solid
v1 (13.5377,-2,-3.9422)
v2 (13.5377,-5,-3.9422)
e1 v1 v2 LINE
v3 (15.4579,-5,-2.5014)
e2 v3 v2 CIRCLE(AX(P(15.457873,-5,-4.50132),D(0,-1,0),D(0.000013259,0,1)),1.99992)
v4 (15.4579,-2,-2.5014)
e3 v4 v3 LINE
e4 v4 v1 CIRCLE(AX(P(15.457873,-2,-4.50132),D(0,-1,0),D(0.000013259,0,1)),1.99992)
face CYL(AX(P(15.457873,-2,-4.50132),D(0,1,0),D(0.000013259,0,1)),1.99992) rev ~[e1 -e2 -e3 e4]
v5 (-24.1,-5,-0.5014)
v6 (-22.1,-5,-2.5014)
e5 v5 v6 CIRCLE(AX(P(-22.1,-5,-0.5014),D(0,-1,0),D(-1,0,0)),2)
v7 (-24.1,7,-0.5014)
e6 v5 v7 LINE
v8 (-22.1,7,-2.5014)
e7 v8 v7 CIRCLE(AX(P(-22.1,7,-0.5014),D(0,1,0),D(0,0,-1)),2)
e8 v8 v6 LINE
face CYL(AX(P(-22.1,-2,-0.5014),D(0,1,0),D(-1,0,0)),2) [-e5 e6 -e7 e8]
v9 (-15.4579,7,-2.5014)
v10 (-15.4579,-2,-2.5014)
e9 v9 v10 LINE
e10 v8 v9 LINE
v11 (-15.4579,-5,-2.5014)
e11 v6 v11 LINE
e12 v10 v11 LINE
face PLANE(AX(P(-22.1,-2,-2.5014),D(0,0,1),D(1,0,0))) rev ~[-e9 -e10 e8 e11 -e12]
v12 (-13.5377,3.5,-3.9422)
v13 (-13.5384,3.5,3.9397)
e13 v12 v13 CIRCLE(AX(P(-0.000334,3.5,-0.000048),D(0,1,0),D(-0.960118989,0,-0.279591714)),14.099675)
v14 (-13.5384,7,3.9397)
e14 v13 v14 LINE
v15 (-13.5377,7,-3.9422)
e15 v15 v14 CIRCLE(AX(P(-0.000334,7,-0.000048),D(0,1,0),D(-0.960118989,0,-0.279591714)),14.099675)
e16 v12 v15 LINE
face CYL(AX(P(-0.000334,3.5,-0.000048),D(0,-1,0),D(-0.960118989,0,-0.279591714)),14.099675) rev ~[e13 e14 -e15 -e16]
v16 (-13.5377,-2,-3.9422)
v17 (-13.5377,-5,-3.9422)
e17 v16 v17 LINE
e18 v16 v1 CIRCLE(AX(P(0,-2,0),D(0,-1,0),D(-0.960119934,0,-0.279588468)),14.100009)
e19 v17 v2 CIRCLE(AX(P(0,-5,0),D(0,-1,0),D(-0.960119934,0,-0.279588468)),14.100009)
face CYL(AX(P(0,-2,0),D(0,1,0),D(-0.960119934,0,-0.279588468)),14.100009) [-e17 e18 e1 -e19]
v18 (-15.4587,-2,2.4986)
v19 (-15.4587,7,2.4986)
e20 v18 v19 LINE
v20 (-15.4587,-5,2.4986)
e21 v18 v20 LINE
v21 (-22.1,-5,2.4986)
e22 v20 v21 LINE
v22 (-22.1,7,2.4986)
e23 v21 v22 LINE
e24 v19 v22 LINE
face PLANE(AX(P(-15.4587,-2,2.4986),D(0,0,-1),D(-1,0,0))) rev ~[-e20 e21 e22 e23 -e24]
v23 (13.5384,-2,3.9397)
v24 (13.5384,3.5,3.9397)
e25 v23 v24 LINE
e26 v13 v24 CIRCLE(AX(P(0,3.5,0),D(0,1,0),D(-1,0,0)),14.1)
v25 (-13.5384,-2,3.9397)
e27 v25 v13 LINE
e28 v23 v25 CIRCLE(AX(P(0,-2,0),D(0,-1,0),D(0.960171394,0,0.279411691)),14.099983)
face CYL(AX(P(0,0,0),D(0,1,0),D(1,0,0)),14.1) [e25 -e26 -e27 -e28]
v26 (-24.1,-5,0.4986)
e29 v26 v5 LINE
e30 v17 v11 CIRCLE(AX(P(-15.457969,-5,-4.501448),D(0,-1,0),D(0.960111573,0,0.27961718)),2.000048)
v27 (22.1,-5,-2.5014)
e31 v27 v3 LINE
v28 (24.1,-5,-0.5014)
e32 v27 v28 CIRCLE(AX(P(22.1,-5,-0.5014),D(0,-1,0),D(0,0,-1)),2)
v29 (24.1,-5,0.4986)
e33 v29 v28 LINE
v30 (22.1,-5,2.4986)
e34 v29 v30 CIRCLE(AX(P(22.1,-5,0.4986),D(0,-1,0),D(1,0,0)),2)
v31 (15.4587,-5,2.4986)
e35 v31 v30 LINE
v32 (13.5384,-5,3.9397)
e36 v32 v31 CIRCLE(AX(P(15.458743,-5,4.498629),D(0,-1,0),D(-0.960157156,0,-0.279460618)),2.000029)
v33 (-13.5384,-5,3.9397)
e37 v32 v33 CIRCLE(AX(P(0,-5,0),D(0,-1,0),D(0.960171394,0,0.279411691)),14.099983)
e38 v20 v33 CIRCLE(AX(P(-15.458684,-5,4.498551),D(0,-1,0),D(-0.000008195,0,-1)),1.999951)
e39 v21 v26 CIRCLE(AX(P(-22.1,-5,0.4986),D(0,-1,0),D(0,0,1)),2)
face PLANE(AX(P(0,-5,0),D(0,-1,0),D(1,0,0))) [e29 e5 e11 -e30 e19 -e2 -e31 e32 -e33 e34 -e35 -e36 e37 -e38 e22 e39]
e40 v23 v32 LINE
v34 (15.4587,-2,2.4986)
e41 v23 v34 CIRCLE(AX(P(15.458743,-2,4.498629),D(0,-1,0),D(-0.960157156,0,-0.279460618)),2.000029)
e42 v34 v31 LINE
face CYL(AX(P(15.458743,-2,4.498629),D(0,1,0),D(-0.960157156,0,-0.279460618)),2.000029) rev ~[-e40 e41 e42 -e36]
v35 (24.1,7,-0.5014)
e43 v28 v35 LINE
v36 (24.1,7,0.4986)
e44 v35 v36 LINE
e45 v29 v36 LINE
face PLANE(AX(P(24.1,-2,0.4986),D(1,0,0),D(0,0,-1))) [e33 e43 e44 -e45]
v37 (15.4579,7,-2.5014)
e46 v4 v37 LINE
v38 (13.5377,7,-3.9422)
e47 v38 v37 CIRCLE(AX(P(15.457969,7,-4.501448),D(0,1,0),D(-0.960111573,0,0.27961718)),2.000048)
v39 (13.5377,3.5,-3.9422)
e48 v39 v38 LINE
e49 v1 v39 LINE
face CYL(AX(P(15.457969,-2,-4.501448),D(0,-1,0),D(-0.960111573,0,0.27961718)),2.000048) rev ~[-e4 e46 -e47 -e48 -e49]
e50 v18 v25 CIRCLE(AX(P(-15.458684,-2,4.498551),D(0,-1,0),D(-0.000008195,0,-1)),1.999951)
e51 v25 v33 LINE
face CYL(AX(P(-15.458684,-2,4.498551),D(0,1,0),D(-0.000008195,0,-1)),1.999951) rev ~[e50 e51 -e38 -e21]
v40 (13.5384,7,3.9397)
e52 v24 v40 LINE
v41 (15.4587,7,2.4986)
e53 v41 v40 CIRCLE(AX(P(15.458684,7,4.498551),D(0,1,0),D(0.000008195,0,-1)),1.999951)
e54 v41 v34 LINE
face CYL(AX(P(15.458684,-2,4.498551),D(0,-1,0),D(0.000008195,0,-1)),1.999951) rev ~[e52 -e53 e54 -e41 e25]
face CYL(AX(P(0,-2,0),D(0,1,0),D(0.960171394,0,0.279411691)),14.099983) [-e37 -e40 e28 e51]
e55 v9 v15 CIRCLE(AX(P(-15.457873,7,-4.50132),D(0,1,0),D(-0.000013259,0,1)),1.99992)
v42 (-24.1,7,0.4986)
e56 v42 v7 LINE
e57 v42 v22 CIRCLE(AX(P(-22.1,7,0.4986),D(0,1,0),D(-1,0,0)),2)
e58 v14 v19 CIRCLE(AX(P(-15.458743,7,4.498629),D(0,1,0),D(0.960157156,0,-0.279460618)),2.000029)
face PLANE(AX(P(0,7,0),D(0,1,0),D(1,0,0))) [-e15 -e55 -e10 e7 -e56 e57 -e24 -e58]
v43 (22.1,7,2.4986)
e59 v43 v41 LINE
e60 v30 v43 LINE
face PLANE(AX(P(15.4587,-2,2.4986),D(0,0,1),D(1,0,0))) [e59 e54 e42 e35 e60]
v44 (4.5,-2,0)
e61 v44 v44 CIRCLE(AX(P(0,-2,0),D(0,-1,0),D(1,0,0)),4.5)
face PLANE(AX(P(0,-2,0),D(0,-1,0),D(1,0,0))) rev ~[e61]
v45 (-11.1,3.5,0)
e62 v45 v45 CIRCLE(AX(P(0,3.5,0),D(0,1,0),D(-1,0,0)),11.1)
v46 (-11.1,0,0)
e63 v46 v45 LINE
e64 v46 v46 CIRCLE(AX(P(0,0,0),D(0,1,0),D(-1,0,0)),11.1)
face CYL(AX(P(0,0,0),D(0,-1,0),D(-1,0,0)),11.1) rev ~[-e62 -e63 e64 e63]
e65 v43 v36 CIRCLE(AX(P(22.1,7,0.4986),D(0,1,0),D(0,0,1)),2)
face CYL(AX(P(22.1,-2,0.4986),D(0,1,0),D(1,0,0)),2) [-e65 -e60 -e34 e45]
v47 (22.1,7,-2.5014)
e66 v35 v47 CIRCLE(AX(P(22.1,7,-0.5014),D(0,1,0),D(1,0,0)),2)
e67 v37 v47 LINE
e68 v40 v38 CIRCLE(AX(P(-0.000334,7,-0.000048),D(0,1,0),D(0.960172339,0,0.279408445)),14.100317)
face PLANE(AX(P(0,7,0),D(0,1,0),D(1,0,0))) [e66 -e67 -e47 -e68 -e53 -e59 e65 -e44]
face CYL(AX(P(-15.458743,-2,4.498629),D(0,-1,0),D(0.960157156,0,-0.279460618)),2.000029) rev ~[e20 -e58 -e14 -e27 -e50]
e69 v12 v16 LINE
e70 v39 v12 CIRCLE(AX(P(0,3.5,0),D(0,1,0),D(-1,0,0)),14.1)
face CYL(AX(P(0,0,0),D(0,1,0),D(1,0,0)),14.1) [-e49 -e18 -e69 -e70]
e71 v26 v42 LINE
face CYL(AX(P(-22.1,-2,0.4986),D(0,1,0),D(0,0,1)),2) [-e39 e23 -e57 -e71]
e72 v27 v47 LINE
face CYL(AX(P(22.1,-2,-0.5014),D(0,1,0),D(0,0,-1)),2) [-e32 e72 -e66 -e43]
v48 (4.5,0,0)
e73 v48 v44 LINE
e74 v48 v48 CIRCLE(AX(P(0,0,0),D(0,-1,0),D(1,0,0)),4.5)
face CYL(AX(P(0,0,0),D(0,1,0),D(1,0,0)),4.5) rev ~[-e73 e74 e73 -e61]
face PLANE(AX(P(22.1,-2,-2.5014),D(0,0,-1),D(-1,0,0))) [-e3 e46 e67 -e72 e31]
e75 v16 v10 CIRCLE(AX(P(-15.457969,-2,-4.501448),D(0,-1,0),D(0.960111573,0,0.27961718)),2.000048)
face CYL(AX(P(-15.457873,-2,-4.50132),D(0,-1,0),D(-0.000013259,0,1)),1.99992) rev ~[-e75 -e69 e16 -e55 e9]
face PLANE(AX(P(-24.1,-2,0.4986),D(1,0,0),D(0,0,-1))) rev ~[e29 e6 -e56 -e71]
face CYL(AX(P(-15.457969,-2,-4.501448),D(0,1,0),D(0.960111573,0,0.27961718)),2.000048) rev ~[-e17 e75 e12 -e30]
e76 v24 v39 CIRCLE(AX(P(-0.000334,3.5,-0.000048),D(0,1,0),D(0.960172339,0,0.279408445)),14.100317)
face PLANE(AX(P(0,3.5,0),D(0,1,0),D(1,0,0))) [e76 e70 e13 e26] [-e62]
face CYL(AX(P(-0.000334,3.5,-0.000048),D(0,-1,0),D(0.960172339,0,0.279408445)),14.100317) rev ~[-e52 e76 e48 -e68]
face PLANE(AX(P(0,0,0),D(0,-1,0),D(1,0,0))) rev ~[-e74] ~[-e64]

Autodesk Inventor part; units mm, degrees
ref_plane "YZ Plane" through (0, 0, 0) normal (1, 0, 0) x (0, 1, 0)
ref_plane "XZ Plane" through (0, 0, 0) normal (0, 1, 0) x (-1, 0, 0)
ref_plane "XY Plane" through (0, 0, 0) normal (0, 0, 1) x (1, 0, 0)
sketch "Sketch2" plane through (0, 0, 0) normal (0, 1, 0) x (-1, 0, 0)
  circle A0 centre (0, 0) radius 11.1
  circle A1 centre (0, 0) radius 14.1
  dimension "d5" = 22.2
  dimension "d6" = 3
extrude "Extrusion2" add sketch "Sketch2" along normal blind 3.5
sketch "Sketch3" plane through (0, 0, 0) normal (0, -1, 0) x (1, 0, 0)
  circle A0 centre (0, 0) radius 14.1 projected
  circle A1 centre (0, 0) radius 4.5
  dimension "d9" = 9
extrude "Extrusion3" add sketch "Sketch3" along normal blind 2
sketch "Sketch4" plane through (0, -2, 0) normal (0, -1, 0) x (1, 0, 0)
  line L0 (-22.1, -2.5014) -> (-15.4579, -2.5014)
  line L1 (-15.4587, 2.4986) -> (-22.1, 2.4986)
  line L2 (-24.1, 0.4986) -> (-24.1, -0.5014)
  line L3 (-24.1, -2.5014) -> (-14.1, 2.4986) construction
  line L4 (-14.1, -2.5014) -> (-24.1, 2.4986) construction
  line L5 (-14.1, -2.5014) -> (-13.8763, -2.5014)
  line L6 (-14.1, 2.4986) -> (-13.8769, 2.4986)
  arc A0 (-13.5377, -3.9422) -> (-15.4579, -2.5014) centre (-15.4579, -4.5014) ccw
  arc A1 (-15.4587, 2.4986) -> (-13.5384, 3.9397) centre (-15.4587, 4.4986) ccw
  arc A2 (-24.1, -0.5014) -> (-22.1, -2.5014) centre (-22.1, -0.5014) ccw
  arc A3 (-22.1, 2.4986) -> (-24.1, 0.4986) centre (-22.1, 0.4986) ccw
  line L7 (0, -19.3985) -> (0, 27.2303) construction
  line L8 (22.1, -2.5014) -> (15.4579, -2.5014)
  line L9 (15.4587, 2.4986) -> (22.1, 2.4986)
  line L10 (24.1, 0.4986) -> (24.1, -0.5014)
  arc A4 (15.4579, -2.5014) -> (13.5377, -3.9422) centre (15.4579, -4.5014) ccw
  arc A5 (13.5384, 3.9397) -> (15.4587, 2.4986) centre (15.4587, 4.4986) ccw
  arc A6 (22.1, -2.5014) -> (24.1, -0.5014) centre (22.1, -0.5014) ccw
  arc A7 (24.1, 0.4986) -> (22.1, 2.4986) centre (22.1, 0.4986) ccw
  arc A8 (-13.5377, -3.9422) -> (13.5377, -3.9422) centre (0, 0) ccw
  arc A9 (13.5384, 3.9397) -> (-13.5384, 3.9397) centre (0, 0) ccw
  point P0 (-19.1, -0.0014)
  point P1 (14.1, 0)
  point P2 (-14.1, 0)
  point P3 (-14.1, 0)
  dimension "d13" = 5
  dimension "d14" = 2
extrude "Extrusion4" add sketch "Sketch4" along normal blind 3
sketch "Sketch5" plane through (0, -2, 0) normal (0, 1, 0) x (1, 0, 0)
  arc A0 (-13.5377, 3.9422) -> (-13.5384, -3.9397) centre (0, 0) ccw projected
  arc A1 (-15.4579, 2.5014) -> (-13.5377, 3.9422) centre (-15.4579, 4.5014) ccw projected
  line L0 (-22.1, 2.5014) -> (-15.4579, 2.5014) projected
  arc A2 (-22.1, 2.5014) -> (-24.1, 0.5014) centre (-22.1, 0.5014) ccw projected
  line L1 (-24.1, -0.4986) -> (-24.1, 0.5014) projected
  arc A3 (-24.1, -0.4986) -> (-22.1, -2.4986) centre (-22.1, -0.4986) ccw projected
  line L2 (-15.4587, -2.4986) -> (-22.1, -2.4986) projected
  arc A4 (-13.5384, -3.9397) -> (-15.4587, -2.4986) centre (-15.4587, -4.4986) ccw projected
  arc A5 (13.5384, -3.9397) -> (13.5377, 3.9422) centre (0, 0) ccw projected
  arc A6 (15.4587, -2.4986) -> (13.5384, -3.9397) centre (15.4587, -4.4986) ccw projected
  line L3 (22.1, -2.4986) -> (15.4587, -2.4986) projected
  arc A7 (22.1, -2.4986) -> (24.1, -0.4986) centre (22.1, -0.4986) ccw projected
  line L4 (24.1, 0.5014) -> (24.1, -0.4986) projected
  arc A8 (24.1, 0.5014) -> (22.1, 2.5014) centre (22.1, 0.5014) ccw projected
  line L5 (15.4579, 2.5014) -> (22.1, 2.5014) projected
  arc A9 (13.5377, 3.9422) -> (15.4579, 2.5014) centre (15.4579, 4.5014) ccw projected
extrude "Extrusion5" add sketch "Sketch5" along normal up to surface (5.5 mm away)
sketch "Sketch6" plane through (0, 3.5, 0) normal (0, 1, 0) x (1, 0, 0)
  arc A0 (-15.4579, 2.5014) -> (-13.5377, 3.9422) centre (-15.4579, 4.5014) ccw projected
  line L0 (-22.1, 2.5014) -> (-15.4579, 2.5014) projected
  arc A1 (-22.1, 2.5014) -> (-24.1, 0.5014) centre (-22.1, 0.5014) ccw projected
  line L1 (-24.1, -0.4986) -> (-24.1, 0.5014) projected
  arc A2 (-24.1, -0.4986) -> (-22.1, -2.4986) centre (-22.1, -0.4986) ccw projected
  line L2 (-15.4587, -2.4986) -> (-22.1, -2.4986) projected
  arc A3 (-13.5384, -3.9397) -> (-15.4587, -2.4986) centre (-15.4587, -4.4986) ccw projected
  arc A4 (-13.5377, 3.9422) -> (-13.5384, -3.9397) centre (0, 0) ccw projected
  arc A5 (15.4587, -2.4986) -> (13.5384, -3.9397) centre (15.4587, -4.4986) ccw projected
  line L3 (22.1, -2.4986) -> (15.4587, -2.4986) projected
  arc A6 (22.1, -2.4986) -> (24.1, -0.4986) centre (22.1, -0.4986) ccw projected
  line L4 (24.1, 0.5014) -> (24.1, -0.4986) projected
  arc A7 (24.1, 0.5014) -> (22.1, 2.5014) centre (22.1, 0.5014) ccw projected
  line L5 (15.4579, 2.5014) -> (22.1, 2.5014) projected
  arc A8 (13.5377, 3.9422) -> (15.4579, 2.5014) centre (15.4579, 4.5014) ccw projected
  arc A9 (13.5384, -3.9397) -> (13.5377, 3.9422) centre (0, 0) ccw projected
extrude "Extrusion6" add sketch "Sketch6" along normal blind 3.5
sketch "Sketch1" plane through (0, 0, 0) normal (0, 1, 0) x (-1, 0, 0)
  line L0 (40, 40) -> (-40, 40)
  line L1 (-40, 40) -> (-40, -40)
  line L2 (-40, -40) -> (40, -40)
  line L3 (40, -40) -> (40, 40)
  line L4 (40, 40) -> (-40, -40) construction
  line L5 (-40, 40) -> (40, -40) construction
  point P0 (0, 0)
  dimension "d0" = 80
  dimension "d1" = 80
properties part number "caja_down"
